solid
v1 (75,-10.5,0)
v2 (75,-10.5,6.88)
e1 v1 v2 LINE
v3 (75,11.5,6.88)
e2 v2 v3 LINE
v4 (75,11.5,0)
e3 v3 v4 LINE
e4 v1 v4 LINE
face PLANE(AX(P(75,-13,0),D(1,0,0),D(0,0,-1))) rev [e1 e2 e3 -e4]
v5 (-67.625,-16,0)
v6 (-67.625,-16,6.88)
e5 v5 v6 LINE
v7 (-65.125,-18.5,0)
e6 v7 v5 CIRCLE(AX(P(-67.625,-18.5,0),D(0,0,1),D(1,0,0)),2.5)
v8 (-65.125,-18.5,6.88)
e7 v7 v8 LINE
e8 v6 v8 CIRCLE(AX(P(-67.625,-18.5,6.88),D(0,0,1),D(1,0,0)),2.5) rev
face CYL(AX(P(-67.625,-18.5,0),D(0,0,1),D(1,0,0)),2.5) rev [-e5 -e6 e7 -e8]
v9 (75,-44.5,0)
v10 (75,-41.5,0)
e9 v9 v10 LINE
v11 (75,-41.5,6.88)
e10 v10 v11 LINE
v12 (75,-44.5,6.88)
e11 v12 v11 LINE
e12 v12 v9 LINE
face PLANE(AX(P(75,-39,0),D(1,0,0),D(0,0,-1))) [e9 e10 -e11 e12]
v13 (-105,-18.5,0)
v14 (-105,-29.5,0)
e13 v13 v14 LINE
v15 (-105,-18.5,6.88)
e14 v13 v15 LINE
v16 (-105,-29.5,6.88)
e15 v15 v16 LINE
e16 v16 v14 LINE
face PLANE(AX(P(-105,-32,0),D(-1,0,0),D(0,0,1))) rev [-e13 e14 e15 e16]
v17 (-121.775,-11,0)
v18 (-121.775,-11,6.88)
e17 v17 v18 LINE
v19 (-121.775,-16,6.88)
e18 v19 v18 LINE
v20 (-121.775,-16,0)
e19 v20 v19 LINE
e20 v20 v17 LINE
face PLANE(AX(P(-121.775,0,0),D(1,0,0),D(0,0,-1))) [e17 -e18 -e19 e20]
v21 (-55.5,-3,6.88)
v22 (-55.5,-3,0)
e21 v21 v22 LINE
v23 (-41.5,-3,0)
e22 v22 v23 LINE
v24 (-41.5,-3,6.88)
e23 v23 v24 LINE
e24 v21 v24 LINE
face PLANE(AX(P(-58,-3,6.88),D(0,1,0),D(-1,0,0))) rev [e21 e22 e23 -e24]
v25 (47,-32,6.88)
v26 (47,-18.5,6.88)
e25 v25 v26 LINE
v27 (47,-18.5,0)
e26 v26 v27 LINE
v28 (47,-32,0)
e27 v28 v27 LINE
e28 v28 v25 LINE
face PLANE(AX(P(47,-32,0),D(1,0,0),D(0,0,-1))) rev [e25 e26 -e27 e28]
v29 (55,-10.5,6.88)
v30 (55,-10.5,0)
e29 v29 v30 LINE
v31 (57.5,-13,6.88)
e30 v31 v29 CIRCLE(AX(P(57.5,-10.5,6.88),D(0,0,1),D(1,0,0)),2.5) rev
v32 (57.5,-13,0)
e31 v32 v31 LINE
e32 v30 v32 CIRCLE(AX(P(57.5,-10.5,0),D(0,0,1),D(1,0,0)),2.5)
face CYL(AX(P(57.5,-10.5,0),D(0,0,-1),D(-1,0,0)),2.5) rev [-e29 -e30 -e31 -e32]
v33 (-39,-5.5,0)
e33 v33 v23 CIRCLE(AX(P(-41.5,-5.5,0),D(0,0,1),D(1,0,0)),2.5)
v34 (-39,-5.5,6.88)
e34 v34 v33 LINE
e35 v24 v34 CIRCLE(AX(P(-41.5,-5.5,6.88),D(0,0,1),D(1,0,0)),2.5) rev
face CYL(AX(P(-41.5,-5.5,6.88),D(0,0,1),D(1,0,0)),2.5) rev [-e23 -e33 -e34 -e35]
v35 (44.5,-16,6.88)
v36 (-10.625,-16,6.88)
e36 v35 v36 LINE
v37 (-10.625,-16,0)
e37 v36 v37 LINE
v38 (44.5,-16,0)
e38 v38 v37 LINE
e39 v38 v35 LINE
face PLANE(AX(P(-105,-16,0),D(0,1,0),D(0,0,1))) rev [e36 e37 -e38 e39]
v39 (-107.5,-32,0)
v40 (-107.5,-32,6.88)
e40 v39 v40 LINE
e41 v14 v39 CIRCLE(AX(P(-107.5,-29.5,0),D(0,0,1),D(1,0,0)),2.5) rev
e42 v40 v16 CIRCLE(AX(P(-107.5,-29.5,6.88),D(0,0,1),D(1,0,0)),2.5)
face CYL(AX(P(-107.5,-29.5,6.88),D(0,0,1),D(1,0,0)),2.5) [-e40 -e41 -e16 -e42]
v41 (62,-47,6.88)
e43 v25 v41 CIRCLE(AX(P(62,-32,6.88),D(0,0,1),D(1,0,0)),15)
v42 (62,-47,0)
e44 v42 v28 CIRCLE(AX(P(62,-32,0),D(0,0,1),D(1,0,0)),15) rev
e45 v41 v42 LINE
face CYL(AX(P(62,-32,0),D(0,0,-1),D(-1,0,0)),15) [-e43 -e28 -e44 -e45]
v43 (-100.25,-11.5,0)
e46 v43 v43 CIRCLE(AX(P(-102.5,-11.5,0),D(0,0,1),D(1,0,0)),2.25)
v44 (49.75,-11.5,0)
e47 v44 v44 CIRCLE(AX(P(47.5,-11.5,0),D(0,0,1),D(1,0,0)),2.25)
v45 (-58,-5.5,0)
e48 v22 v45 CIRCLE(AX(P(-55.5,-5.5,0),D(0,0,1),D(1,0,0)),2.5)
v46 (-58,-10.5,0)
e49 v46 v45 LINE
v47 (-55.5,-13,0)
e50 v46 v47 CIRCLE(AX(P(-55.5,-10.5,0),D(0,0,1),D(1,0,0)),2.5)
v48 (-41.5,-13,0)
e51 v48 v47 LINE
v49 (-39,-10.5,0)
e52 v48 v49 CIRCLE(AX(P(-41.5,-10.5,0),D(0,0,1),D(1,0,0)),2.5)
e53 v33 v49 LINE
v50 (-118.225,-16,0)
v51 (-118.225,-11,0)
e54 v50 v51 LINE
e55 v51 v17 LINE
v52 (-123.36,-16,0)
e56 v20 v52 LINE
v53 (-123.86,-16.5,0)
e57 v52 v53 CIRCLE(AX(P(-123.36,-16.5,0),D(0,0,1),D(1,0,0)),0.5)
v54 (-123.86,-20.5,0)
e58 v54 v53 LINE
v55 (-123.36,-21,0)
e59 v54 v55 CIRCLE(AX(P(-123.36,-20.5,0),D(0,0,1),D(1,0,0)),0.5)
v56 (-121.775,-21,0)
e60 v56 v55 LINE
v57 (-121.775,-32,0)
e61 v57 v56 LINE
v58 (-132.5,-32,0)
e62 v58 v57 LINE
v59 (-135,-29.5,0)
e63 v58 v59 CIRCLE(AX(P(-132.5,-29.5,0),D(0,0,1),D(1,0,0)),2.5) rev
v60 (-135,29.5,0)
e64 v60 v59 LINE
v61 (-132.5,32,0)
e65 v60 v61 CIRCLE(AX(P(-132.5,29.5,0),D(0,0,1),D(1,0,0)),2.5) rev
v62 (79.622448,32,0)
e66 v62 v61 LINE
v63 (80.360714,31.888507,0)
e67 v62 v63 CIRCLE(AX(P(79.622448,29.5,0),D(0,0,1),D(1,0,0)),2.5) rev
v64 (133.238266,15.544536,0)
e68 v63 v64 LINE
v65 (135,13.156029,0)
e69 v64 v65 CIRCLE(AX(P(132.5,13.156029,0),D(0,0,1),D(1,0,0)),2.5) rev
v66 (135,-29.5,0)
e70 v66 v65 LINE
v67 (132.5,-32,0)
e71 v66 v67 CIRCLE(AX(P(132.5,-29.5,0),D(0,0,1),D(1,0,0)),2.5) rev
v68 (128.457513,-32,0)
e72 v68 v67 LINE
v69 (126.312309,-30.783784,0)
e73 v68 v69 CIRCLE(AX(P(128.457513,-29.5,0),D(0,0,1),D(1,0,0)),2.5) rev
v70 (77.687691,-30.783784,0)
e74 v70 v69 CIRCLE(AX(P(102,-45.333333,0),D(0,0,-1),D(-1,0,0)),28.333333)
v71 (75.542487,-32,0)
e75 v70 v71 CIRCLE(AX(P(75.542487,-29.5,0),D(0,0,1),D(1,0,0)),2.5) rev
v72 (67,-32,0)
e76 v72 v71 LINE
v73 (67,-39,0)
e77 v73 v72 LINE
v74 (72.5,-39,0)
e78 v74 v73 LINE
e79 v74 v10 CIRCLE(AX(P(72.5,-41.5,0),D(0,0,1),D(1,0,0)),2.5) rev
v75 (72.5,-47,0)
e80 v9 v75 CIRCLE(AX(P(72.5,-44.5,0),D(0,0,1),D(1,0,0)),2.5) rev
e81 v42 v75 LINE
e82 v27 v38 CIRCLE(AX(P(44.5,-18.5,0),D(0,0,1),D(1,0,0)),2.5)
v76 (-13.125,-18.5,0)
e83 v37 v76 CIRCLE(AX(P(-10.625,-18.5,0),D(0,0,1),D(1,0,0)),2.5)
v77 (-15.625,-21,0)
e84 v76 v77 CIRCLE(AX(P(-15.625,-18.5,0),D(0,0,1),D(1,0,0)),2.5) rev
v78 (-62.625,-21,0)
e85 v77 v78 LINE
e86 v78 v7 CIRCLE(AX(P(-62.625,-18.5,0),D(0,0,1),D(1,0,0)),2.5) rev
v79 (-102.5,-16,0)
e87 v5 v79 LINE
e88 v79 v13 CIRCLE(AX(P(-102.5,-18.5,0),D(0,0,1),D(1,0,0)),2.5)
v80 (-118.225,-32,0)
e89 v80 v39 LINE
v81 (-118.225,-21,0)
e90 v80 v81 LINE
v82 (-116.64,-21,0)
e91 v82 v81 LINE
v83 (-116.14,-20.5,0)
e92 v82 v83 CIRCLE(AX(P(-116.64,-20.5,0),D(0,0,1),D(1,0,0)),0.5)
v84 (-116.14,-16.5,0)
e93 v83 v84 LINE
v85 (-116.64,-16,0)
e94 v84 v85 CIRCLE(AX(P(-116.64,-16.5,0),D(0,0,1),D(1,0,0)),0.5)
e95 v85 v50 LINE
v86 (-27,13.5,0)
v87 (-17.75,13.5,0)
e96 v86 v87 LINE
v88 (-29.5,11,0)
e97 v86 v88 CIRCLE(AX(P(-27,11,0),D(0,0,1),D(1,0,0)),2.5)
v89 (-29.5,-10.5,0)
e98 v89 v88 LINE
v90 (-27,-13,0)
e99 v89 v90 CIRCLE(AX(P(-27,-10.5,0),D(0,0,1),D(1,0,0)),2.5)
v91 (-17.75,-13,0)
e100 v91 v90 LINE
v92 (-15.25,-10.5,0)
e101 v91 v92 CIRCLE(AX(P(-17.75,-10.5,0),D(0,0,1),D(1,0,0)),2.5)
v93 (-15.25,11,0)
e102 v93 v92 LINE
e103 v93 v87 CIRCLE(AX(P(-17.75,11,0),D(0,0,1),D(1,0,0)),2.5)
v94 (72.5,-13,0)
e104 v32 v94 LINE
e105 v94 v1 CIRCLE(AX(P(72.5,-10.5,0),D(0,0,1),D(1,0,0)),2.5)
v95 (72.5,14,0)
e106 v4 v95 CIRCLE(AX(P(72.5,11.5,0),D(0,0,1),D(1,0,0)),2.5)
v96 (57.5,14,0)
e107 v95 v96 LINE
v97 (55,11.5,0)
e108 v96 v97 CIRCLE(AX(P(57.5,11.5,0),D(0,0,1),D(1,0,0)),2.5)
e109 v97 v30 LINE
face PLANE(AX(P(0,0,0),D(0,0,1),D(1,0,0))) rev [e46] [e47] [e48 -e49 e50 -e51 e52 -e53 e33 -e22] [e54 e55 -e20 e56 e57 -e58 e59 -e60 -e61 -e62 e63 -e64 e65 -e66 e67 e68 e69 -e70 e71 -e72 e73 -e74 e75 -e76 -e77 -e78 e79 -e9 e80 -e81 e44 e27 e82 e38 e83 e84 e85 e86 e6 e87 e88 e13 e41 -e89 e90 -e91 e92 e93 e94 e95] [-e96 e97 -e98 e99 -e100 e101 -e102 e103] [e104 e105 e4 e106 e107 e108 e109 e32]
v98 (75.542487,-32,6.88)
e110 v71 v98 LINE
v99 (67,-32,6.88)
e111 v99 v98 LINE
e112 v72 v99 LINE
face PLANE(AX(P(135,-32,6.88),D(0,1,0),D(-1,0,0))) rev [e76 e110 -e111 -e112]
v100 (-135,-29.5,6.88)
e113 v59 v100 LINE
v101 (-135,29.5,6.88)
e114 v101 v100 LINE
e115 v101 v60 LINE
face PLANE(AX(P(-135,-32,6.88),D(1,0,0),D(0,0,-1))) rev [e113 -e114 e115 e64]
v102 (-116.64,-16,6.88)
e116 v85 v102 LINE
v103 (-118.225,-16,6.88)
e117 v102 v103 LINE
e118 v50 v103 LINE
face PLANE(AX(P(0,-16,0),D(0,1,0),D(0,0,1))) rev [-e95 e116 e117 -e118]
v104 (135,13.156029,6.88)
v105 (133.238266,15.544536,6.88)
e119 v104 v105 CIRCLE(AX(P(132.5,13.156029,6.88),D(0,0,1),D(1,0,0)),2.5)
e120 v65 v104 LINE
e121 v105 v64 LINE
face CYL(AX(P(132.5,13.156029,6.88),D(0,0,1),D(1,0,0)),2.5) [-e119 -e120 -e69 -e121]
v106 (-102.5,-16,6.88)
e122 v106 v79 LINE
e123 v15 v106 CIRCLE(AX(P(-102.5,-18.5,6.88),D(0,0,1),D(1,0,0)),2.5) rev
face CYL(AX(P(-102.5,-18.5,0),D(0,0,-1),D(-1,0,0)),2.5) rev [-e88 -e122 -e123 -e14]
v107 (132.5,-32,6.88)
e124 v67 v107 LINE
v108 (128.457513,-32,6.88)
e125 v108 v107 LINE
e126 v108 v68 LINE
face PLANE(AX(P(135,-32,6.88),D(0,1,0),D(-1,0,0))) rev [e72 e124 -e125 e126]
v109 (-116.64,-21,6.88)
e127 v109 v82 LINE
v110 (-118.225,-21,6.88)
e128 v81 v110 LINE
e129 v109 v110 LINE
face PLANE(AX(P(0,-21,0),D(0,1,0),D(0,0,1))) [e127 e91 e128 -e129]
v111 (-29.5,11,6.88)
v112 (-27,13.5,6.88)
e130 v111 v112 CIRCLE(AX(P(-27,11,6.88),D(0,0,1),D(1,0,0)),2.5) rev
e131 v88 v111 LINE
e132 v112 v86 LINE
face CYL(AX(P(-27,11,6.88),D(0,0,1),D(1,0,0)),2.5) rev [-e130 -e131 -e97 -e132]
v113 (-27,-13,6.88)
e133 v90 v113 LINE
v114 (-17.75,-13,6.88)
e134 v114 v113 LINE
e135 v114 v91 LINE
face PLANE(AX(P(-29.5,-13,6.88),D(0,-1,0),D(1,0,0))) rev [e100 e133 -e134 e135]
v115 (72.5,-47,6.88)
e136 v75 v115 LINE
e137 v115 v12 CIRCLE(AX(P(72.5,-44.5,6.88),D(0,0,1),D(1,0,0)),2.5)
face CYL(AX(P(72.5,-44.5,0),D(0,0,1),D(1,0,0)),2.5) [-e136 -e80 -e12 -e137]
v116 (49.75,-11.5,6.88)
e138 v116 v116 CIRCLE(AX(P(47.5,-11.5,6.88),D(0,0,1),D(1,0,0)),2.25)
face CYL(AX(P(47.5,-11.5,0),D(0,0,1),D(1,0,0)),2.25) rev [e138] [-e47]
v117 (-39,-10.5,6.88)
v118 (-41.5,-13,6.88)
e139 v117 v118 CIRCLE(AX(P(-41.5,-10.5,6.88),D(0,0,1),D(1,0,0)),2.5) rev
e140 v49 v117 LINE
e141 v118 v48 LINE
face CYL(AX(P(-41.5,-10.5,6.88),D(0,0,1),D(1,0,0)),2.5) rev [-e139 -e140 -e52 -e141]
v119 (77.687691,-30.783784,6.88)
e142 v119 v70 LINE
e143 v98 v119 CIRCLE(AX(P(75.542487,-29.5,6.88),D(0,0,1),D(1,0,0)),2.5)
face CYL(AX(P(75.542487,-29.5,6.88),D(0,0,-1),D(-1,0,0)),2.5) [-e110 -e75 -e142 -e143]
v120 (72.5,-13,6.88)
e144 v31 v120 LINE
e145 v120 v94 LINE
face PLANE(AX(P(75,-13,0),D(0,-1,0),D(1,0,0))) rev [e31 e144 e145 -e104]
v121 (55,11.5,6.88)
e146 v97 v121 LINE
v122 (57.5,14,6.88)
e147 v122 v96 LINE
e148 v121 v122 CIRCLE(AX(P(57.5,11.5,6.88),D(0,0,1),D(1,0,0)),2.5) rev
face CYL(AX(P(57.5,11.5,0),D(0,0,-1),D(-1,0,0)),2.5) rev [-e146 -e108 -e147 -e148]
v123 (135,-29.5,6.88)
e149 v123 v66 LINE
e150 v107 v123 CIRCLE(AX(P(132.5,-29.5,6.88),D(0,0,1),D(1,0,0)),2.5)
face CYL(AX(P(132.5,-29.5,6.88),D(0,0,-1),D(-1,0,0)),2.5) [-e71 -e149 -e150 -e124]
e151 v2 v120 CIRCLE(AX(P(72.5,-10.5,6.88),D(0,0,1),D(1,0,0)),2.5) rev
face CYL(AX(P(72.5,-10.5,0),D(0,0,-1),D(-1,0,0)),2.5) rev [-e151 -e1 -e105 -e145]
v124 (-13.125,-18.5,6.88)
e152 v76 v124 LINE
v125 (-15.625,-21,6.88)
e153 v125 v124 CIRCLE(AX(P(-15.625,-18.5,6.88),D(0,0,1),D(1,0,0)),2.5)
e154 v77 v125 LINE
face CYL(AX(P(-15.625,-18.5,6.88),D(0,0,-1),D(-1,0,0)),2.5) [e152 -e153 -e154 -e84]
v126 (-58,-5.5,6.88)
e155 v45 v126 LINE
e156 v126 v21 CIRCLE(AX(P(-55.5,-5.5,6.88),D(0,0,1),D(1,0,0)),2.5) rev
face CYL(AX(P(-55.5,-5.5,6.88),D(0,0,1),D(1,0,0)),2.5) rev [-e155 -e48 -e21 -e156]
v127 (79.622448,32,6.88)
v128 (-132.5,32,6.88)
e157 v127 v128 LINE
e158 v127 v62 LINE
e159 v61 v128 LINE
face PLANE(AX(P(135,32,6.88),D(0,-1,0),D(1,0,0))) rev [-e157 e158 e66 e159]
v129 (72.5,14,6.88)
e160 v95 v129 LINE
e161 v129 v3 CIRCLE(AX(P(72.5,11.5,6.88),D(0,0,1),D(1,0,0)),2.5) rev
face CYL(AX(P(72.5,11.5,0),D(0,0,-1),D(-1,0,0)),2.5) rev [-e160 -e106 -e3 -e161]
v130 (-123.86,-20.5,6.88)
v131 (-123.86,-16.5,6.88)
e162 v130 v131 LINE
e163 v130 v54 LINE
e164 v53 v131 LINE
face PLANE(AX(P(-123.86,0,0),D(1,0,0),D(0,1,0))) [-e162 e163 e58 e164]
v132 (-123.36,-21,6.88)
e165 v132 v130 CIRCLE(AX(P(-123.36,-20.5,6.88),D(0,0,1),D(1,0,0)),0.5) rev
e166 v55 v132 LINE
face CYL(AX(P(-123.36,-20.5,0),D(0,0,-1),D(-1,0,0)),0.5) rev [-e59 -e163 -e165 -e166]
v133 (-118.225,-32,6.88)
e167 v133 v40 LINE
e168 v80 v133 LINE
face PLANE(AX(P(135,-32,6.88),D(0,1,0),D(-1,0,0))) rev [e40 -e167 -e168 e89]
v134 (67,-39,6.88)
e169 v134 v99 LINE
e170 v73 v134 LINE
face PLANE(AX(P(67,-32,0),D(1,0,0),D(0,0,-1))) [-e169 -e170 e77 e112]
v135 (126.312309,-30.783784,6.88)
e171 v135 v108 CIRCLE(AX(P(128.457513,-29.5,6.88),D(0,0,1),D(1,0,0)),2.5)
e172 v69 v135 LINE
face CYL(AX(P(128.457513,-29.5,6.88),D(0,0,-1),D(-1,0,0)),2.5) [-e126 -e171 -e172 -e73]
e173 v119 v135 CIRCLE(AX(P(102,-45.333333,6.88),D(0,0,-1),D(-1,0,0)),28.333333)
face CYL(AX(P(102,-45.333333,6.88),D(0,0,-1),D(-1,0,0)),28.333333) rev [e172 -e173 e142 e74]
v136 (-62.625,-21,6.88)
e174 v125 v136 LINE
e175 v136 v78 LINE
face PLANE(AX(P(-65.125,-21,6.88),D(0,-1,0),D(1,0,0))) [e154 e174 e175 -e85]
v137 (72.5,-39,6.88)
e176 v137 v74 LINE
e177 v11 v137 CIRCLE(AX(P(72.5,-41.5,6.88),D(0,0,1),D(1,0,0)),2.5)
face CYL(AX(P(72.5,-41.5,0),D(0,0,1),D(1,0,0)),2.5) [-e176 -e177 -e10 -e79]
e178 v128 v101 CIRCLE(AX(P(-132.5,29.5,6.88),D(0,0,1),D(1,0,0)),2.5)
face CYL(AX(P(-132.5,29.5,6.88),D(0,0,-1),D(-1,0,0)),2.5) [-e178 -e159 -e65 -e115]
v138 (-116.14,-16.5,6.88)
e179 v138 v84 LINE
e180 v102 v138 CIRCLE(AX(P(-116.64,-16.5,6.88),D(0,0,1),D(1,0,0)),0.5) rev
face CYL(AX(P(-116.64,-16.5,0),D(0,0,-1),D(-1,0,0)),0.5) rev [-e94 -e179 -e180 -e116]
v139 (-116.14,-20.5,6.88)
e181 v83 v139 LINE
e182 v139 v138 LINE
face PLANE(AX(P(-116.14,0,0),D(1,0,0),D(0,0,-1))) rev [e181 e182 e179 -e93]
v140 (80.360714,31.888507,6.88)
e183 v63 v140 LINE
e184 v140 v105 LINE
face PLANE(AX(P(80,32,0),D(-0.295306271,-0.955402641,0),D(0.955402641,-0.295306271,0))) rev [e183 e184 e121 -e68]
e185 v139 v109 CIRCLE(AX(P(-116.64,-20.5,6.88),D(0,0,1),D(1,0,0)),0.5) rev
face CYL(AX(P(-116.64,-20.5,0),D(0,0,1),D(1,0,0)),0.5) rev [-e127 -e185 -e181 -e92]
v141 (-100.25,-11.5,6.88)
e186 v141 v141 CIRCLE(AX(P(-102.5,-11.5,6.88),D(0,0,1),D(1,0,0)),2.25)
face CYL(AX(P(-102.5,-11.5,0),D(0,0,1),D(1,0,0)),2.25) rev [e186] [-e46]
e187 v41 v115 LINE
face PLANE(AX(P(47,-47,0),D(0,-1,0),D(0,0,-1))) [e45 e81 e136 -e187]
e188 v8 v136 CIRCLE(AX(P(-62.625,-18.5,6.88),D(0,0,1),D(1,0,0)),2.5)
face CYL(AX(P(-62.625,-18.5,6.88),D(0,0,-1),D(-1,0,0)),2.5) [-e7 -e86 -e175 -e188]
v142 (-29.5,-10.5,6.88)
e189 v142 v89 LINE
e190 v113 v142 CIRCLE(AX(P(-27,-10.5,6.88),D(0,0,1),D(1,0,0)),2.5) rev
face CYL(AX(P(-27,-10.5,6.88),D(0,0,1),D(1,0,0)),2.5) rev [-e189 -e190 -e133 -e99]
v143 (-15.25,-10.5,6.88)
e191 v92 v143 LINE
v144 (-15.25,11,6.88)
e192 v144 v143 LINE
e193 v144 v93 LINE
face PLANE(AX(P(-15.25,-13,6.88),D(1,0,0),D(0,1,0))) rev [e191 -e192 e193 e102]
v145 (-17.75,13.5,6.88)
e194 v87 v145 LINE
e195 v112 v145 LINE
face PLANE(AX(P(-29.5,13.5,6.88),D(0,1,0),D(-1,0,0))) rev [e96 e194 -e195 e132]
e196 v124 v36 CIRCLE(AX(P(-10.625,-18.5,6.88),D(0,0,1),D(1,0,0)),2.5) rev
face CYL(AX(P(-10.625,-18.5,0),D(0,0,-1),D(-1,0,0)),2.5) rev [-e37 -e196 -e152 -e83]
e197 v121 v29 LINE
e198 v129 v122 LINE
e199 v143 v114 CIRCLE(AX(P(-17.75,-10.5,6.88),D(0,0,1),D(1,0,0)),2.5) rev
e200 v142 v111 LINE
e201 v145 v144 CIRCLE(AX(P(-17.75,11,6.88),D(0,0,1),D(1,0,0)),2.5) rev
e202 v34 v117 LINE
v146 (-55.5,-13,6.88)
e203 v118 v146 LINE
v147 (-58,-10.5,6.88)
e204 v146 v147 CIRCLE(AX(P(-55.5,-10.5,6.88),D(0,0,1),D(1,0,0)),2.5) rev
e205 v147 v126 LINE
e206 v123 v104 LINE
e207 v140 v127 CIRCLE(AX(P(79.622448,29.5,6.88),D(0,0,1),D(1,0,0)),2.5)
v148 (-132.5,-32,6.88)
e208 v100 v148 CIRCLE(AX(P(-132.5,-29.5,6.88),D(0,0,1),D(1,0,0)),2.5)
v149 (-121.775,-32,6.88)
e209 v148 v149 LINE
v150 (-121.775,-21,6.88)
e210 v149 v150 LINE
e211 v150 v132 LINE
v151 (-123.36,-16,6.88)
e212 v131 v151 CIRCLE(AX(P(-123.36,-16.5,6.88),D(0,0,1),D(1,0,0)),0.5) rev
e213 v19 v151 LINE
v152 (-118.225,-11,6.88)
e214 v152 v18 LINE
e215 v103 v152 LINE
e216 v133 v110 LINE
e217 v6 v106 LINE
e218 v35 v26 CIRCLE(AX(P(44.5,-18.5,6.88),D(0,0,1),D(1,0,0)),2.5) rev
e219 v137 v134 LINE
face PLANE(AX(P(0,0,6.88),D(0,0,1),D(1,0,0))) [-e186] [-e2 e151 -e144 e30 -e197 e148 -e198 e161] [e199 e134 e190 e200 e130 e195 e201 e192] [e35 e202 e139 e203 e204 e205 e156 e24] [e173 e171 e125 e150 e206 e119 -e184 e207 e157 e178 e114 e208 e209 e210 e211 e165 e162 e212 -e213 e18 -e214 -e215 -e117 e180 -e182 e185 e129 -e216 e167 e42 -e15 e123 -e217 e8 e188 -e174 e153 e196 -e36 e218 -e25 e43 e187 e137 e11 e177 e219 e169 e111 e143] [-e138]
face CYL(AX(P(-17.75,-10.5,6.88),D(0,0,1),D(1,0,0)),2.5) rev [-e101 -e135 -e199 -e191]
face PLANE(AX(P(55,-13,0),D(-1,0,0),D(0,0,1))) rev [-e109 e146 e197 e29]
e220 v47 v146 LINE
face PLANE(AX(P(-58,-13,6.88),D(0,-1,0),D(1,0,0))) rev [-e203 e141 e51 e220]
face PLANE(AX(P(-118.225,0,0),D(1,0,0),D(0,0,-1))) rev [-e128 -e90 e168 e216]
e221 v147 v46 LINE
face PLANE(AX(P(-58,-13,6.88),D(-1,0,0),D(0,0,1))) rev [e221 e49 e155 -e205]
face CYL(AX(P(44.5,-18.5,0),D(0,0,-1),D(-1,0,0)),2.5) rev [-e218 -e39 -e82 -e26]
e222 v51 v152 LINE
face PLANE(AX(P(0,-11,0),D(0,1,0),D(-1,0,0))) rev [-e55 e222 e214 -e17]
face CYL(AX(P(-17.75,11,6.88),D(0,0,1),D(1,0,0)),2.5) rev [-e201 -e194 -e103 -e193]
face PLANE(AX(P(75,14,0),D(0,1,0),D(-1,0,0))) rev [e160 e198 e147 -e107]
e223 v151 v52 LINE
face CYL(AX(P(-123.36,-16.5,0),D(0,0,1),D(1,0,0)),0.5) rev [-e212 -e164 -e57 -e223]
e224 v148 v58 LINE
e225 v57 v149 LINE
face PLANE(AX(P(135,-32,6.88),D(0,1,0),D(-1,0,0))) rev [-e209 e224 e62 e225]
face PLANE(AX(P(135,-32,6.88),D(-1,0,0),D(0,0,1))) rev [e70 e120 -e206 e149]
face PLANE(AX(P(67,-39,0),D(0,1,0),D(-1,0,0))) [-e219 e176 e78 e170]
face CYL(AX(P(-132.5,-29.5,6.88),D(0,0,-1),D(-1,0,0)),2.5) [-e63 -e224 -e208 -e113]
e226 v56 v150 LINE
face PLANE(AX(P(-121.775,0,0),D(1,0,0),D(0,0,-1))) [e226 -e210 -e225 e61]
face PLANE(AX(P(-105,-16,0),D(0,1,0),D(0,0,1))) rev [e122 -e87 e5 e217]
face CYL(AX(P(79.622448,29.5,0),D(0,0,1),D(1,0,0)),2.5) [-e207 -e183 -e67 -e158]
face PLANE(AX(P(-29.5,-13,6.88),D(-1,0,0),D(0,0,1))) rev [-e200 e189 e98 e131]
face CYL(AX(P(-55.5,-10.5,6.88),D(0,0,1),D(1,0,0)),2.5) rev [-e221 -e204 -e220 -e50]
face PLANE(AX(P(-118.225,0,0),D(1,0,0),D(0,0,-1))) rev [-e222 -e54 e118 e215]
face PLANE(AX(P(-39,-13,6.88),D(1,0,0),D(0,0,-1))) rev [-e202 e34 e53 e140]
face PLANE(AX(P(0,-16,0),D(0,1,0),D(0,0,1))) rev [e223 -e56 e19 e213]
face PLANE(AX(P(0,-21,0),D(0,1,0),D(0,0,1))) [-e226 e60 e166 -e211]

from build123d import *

# Parameters (mm, degrees)
SKETCH1_W           = 270
SKETCH1_H           = 64
BOSS_EXTRUDE1_DEPTH = 6.88
SKETCH2_W           = 20
SKETCH2_H           = 27
SKETCH2_W_2         = 152
SKETCH2_H_2         = 16
CUT_EXTRUDE1_DEPTH  = 139.911246485
SKETCH3_R           = 2.25
CUT_EXTRUDE2_DEPTH  = 139.911246485
BOSS_EXTRUDE2_DEPTH = 6.88
SKETCH5_W           = 2.085
SKETCH5_H           = 5
SKETCH5_W_2         = 3.55
SKETCH5_H_2         = 11
CUT_EXTRUDE3_DEPTH  = 144.113012686
SKETCH7_W           = 14.25
SKETCH7_H           = 26.5
SKETCH7_W_2         = 19
SKETCH7_H_2         = 10
CUT_EXTRUDE4_DEPTH  = 144.113012686
SKETCH8_W           = 52
SKETCH8_H           = 8
BOSS_EXTRUDE4_DEPTH = 6.88
CUT_EXTRUDE5_DEPTH  = 144.113012686
FILLET2_R           = 0.5
CUT_EXTRUDE6_DEPTH  = 144.113012686
FILLET1_R           = 2.5
FILLET3_R           = 15


with BuildPart() as part:
    # Sketch1 → Boss-Extrude1 (new body)
    with BuildSketch(Plane.XY):
        Rectangle(SKETCH1_W, SKETCH1_H)
    extrude(amount=BOSS_EXTRUDE1_DEPTH)

    # Sketch2 → Cut-Extrude1 (cut, through all)
    with BuildSketch(Plane.XY.offset(6.88)):
        with Locations((65, 0.5)):
            Rectangle(SKETCH2_W, SKETCH2_H)
        with Locations((-29, -24)):
            Rectangle(SKETCH2_W_2, SKETCH2_H_2)
    extrude(amount=-CUT_EXTRUDE1_DEPTH, mode=Mode.SUBTRACT)

    # Sketch3 → Cut-Extrude2 (cut, through all)
    with BuildSketch(Plane.XY.offset(6.88)):
        with Locations((-102.5, -11.5)):
            Circle(SKETCH3_R)
        with Locations((47.5, -11.5)):
            Circle(SKETCH3_R)
    extrude(amount=-CUT_EXTRUDE2_DEPTH, mode=Mode.SUBTRACT)

    # Sketch4 → Boss-Extrude2 (add)
    with BuildSketch(Plane.XY.offset(6.88)):
        Polygon((47, -32), (67, -32), (67, -39), (75, -39), (75, -47), (47, -47), align=None)
    extrude(amount=-BOSS_EXTRUDE2_DEPTH)

    # Sketch5 → Cut-Extrude3 (cut, through all)
    with BuildSketch(Plane.XY.offset(6.88)):
        with Locations((-117.1825, -18.5)):
            Rectangle(SKETCH5_W, SKETCH5_H)
        with Locations((-120, -18.5)):
            Rectangle(SKETCH5_W_2, SKETCH5_H)
        with Locations((-120, -13.5)):
            Rectangle(SKETCH5_W_2, SKETCH5_H)
        with Locations((-122.8175, -18.5)):
            Rectangle(SKETCH5_W, SKETCH5_H)
        with Locations((-120, -26.5)):
            Rectangle(SKETCH5_W_2, SKETCH5_H_2)
    extrude(amount=-CUT_EXTRUDE3_DEPTH, mode=Mode.SUBTRACT)

    # Sketch7 → Cut-Extrude4 (cut, through all)
    with BuildSketch(Plane(origin=(0, 0, 0), x_dir=(-1, 0, 0), z_dir=(0, 0, -1))):
        with Locations((22.375, 0.25)):
            Rectangle(SKETCH7_W, SKETCH7_H)
        with Locations((48.5, -8)):
            Rectangle(SKETCH7_W_2, SKETCH7_H_2)
    extrude(amount=-CUT_EXTRUDE4_DEPTH, mode=Mode.SUBTRACT)

    # Sketch8 → Boss-Extrude4 (add)
    with BuildSketch(Plane(origin=(0, 0, 0), x_dir=(-1, 0, 0), z_dir=(0, 0, -1))):
        with Locations((39.125, -17)):
            Rectangle(SKETCH8_W, SKETCH8_H)
    extrude(amount=-BOSS_EXTRUDE4_DEPTH)

    # Sketch9 → Cut-Extrude5 (cut, through all)
    with BuildSketch(Plane(origin=(0, 0, 0), x_dir=(-1, 0, 0), z_dir=(0, 0, -1))):
        with BuildLine():
            Line((-77, -32), (-127, -32))
            ThreePointArc((-127, -32), (-102, -17), (-77, -32))
        make_face()
    extrude(amount=-CUT_EXTRUDE5_DEPTH, mode=Mode.SUBTRACT)

    # Fillet2
    fillet2_edges = [part.edges().sort_by_distance(p)[0] for p in [
        (-116.14, -16, 3.44),
        (-116.14, -21, 3.44),
        (-123.86, -21, 3.44),
        (-123.86, -16, 3.44),
    ]]
    fillet(fillet2_edges, radius=FILLET2_R)

    # Sketch10 → Cut-Extrude6 (cut, through all)
    with BuildSketch(Plane.XY.offset(6.88)):
        Polygon((80, 32), (135, 15), (135, 32), align=None)
    extrude(amount=-CUT_EXTRUDE6_DEPTH, mode=Mode.SUBTRACT)

    # Fillet1
    fillet1_edges = [part.edges().sort_by_distance(p)[0] for p in [
        (55, 14, 3.44),
        (75, 14, 3.44),
        (75, -13, 3.44),
        (55, -13, 3.44),
        (-135, 32, 3.44),
        (-135, -32, 3.44),
        (47, -16, 3.44),
        (-105, -16, 3.44),
        (-105, -32, 3.44),
        (75, -47, 3.44),
        (75, -39, 3.44),
        (135, -32, 3.44),
        (-58, -13, 3.44),
        (-39, -13, 3.44),
        (-39, -3, 3.44),
        (-58, -3, 3.44),
        (-29.5, 13.5, 3.44),
        (-15.25, 13.5, 3.44),
        (-15.25, -13, 3.44),
        (-29.5, -13, 3.44),
        (-65.125, -16, 3.44),
        (-65.125, -21, 3.44),
        (-13.125, -21, 3.44),
        (-13.125, -16, 3.44),
        (127, -32, 3.44),
        (77, -32, 3.44),
        (135, 15, 3.44),
        (80, 32, 3.44),
    ]]
    fillet(fillet1_edges, radius=FILLET1_R - 0.0001)  # a hair under: the kernel refuses the full size

    # Fillet3
    fillet3_edges = [part.edges().sort_by_distance(p)[0] for p in [
        (47, -47, 3.44),
    ]]
    fillet(fillet3_edges, radius=FILLET3_R)


solid = part.part
